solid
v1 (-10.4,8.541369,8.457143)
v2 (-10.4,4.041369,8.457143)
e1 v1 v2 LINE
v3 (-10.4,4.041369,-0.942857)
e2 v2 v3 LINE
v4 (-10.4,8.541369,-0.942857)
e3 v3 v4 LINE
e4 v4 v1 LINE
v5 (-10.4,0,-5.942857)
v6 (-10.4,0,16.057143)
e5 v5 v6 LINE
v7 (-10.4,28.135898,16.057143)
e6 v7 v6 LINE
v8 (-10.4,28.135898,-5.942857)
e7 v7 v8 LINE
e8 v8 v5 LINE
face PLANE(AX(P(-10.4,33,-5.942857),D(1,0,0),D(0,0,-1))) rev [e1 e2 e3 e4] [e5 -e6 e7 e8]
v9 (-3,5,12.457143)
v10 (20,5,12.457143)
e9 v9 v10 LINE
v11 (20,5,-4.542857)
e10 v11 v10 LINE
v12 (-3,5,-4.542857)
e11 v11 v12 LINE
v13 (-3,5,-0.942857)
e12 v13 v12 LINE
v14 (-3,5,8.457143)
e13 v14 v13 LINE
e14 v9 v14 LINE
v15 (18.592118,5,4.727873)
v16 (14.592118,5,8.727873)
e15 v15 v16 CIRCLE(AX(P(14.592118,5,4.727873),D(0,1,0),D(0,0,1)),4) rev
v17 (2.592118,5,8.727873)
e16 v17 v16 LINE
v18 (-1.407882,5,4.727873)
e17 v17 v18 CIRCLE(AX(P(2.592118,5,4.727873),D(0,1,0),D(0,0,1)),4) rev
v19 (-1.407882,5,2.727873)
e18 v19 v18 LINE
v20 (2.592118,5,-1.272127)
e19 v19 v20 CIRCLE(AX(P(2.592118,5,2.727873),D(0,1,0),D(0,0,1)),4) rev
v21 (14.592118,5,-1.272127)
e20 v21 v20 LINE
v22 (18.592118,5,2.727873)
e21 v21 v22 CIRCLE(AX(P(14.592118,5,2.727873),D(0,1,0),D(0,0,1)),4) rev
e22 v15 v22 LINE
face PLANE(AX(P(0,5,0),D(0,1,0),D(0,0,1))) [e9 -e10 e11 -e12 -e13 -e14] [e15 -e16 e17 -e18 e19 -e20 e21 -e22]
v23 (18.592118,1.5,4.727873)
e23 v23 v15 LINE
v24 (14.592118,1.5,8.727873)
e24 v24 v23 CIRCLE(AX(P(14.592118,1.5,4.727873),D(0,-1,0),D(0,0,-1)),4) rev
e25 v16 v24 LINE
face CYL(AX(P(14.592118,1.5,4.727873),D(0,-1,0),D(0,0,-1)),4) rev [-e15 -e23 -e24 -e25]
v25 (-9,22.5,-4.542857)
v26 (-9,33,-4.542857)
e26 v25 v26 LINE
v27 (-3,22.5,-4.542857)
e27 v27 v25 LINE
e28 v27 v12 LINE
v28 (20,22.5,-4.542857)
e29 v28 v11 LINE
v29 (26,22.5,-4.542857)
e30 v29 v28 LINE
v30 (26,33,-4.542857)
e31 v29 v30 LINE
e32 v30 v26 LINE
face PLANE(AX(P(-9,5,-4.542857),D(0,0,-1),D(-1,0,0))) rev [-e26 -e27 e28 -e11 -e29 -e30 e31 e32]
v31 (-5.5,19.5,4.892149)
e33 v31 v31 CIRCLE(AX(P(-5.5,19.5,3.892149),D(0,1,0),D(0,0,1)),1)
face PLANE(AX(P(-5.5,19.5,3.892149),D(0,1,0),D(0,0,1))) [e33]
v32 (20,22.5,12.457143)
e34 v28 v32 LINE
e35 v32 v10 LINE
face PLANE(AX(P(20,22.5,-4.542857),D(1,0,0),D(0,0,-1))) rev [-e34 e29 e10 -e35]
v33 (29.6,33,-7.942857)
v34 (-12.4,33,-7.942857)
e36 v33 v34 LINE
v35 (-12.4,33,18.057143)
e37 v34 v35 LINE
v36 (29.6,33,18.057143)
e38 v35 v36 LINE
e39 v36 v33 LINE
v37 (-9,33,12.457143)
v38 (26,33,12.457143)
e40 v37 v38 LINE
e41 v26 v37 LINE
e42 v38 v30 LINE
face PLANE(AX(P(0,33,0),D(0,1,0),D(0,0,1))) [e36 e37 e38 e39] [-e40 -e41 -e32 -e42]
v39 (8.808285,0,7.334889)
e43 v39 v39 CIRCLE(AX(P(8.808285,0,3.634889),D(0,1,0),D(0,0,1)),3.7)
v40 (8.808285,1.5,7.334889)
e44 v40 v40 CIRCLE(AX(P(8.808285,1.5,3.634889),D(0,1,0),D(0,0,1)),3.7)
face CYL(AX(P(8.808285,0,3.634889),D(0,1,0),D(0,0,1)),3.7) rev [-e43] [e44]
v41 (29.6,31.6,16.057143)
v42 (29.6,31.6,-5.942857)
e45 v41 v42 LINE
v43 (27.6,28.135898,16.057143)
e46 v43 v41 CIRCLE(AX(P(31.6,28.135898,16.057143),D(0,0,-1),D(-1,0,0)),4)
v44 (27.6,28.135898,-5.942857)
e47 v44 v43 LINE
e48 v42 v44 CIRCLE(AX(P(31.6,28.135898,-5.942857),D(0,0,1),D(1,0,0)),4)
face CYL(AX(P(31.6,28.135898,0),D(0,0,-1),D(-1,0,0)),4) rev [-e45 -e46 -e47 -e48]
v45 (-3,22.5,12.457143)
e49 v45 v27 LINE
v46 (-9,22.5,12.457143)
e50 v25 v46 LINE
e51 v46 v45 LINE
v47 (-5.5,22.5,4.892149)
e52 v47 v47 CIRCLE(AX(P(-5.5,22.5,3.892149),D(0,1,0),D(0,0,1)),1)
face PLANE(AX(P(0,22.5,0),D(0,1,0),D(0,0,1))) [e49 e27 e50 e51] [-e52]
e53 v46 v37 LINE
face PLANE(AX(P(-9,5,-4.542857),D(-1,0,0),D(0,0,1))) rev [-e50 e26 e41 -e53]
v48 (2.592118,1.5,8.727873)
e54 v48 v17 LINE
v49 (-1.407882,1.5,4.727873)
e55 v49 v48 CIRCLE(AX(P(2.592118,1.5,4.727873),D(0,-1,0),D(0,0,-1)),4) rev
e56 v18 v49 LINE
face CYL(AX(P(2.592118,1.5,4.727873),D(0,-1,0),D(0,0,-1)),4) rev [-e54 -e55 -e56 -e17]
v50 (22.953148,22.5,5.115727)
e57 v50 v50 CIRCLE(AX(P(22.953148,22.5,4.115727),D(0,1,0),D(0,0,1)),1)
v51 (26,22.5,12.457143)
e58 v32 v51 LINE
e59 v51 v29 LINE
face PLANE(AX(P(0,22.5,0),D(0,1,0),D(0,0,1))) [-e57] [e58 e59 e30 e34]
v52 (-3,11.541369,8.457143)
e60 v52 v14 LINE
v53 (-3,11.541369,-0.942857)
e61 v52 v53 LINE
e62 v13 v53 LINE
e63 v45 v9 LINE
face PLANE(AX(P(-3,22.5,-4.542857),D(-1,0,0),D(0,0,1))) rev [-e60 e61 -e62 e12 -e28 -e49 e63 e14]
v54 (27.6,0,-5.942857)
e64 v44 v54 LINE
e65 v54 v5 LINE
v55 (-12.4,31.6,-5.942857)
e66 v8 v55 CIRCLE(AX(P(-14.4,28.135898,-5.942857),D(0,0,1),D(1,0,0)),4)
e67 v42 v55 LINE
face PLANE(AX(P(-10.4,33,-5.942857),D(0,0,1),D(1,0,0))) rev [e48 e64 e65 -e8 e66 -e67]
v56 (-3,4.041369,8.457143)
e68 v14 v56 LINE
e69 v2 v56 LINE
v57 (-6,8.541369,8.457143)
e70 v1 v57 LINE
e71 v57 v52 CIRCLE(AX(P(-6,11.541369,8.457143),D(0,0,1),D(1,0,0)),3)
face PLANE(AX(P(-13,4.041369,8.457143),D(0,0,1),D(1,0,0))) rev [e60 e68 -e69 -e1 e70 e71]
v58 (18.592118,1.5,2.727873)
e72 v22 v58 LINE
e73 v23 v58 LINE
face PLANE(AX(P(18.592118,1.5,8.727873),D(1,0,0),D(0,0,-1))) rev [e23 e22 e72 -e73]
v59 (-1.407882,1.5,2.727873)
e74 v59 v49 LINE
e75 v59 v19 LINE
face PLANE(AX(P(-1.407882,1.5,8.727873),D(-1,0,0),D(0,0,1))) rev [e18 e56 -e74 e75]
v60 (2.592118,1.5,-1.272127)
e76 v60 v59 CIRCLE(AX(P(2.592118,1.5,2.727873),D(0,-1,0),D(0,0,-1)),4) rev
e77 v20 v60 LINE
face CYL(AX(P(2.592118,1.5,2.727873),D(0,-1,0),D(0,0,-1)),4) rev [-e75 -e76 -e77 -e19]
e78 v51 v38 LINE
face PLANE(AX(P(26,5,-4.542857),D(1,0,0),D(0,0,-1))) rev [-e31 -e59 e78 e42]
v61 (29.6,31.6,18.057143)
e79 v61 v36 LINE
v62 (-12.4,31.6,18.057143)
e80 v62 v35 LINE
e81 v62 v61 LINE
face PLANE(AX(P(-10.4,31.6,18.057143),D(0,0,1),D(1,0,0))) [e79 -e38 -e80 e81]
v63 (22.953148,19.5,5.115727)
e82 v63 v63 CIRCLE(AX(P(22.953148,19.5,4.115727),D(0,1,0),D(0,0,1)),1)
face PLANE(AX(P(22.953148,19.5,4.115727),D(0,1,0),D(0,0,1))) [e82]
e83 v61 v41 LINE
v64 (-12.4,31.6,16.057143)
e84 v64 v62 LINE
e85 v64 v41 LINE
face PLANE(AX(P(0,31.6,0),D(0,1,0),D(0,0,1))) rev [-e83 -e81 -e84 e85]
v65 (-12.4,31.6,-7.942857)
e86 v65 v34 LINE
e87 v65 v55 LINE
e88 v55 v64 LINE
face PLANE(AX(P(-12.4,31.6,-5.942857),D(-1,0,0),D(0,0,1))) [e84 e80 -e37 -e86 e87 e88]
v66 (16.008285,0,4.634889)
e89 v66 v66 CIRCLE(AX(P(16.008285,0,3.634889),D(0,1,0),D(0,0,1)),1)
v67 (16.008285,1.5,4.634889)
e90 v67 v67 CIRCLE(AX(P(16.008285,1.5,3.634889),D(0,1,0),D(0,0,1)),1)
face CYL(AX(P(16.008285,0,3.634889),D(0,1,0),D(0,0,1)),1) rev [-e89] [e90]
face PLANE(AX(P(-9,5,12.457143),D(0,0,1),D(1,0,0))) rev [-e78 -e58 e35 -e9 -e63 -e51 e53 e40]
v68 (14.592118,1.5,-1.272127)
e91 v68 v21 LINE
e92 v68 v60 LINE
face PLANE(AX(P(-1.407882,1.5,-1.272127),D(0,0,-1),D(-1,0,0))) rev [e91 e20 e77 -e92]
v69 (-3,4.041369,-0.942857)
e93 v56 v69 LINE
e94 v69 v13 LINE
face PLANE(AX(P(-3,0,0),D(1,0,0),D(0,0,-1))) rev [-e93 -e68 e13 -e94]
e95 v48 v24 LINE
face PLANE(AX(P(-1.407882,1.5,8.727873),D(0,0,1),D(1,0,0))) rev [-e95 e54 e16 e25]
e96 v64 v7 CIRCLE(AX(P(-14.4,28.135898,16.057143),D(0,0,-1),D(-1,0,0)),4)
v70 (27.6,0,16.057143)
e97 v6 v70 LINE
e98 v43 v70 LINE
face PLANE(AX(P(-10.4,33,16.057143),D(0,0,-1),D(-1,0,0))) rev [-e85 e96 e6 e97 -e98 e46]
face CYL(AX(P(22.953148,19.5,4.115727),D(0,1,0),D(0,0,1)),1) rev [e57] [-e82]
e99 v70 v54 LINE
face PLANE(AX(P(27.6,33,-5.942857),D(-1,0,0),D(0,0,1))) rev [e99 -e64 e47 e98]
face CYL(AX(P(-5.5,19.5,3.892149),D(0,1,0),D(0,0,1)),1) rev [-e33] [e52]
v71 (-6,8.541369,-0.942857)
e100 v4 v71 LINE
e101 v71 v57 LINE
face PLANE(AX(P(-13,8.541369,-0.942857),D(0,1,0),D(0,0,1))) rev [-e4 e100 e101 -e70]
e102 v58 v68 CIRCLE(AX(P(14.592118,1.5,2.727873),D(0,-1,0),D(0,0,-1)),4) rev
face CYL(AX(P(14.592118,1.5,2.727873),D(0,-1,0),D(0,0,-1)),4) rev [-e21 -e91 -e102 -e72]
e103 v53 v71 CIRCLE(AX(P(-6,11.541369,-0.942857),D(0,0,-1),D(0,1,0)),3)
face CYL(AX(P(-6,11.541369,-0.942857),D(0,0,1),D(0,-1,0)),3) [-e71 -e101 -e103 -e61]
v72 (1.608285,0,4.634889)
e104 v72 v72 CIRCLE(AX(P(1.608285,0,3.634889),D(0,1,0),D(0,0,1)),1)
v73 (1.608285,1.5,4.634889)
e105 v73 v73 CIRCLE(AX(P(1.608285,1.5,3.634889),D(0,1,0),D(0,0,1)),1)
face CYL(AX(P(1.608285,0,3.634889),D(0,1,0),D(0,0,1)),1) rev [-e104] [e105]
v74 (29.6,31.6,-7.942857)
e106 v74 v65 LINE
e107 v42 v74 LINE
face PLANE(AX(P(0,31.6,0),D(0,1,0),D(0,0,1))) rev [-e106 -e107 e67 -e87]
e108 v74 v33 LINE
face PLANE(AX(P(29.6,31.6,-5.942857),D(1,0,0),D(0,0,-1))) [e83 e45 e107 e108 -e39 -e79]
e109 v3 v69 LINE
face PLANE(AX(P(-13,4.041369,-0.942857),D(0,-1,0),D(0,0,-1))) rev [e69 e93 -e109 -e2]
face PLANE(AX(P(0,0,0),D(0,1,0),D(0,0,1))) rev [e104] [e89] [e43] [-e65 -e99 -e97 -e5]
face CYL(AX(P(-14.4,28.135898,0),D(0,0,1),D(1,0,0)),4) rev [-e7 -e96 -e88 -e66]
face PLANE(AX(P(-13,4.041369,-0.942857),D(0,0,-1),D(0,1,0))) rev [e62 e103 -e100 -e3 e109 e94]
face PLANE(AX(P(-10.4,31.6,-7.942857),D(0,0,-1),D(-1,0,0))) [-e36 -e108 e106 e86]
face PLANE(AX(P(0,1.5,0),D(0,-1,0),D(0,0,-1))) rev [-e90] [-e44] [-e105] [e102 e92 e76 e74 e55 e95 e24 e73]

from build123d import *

# Parameters (mm, degrees)
SKETCH1_W           = 38
SKETCH1_H           = 22
BOSS_EXTRUDE1_DEPTH = 33
SKETCH2_W           = 35
SKETCH2_H           = 17
CUT_EXTRUDE1_DEPTH  = 28
SKETCH3_W           = 6
SKETCH3_H           = 17
BOSS_EXTRUDE2_DEPTH = 17.5
SKETCH4_W           = 42
SKETCH4_H           = 26
SKETCH4_W_2         = 38
SKETCH4_H_2         = 22
EXTRUDE_THIN2_DEPTH = 1.4
SKETCH5_R           = 1
CUT_EXTRUDE2_DEPTH  = 3
SKETCH6_R           = 1
CUT_EXTRUDE3_DEPTH  = 3
SKETCH7_W           = 9.4
SKETCH7_H           = 4.5
CUT_EXTRUDE4_DEPTH  = 10
SKETCH8_W           = 20
SKETCH8_H           = 10
CUT_EXTRUDE5_DEPTH  = 3.5
SKETCH9_R           = 3.7
SKETCH9_R_2         = 1
CUT_EXTRUDE6_DEPTH  = 47.845174865
FILLET1_R           = 4
FILLET2_R           = 3
FILLET3_R           = 4


with BuildPart() as part:
    # Sketch1 → Boss-Extrude1 (new body)
    with BuildSketch(Plane(origin=(0, 0, 0), x_dir=(1, 0, 0), z_dir=(0, 1, 0))):
        with Locations((8.6, -5.057142857)):
            Rectangle(SKETCH1_W, SKETCH1_H)
    extrude(amount=BOSS_EXTRUDE1_DEPTH)

    # Sketch2 → Cut-Extrude1 (cut)
    with BuildSketch(Plane(origin=(0, 33, 0), x_dir=(1, 0, 0), z_dir=(0, 1, 0))):
        with Locations((8.5, -3.957142857)):
            Rectangle(SKETCH2_W, SKETCH2_H)
    extrude(amount=-CUT_EXTRUDE1_DEPTH, mode=Mode.SUBTRACT)

    # Sketch3 → Boss-Extrude2 (add)
    with BuildSketch(Plane(origin=(0, 5, 0), x_dir=(1, 0, 0), z_dir=(0, 1, 0))):
        with Locations((-6, -3.957142857)):
            Rectangle(SKETCH3_W, SKETCH3_H)
        with Locations((23, -3.957142857)):
            Rectangle(SKETCH3_W, SKETCH3_H)
    extrude(amount=BOSS_EXTRUDE2_DEPTH)

    # Sketch4 → Extrude-Thin2 (add)
    with BuildSketch(Plane(origin=(0, 33, 0), x_dir=(1, 0, 0), z_dir=(0, 1, 0))):
        with Locations((8.6, -5.057142857)):
            Rectangle(SKETCH4_W, SKETCH4_H)
        with Locations((8.6, -5.057142857)):
            Rectangle(SKETCH4_W_2, SKETCH4_H_2, mode=Mode.SUBTRACT)
    extrude(amount=-EXTRUDE_THIN2_DEPTH)

    # Sketch5 → Cut-Extrude2 (cut)
    with BuildSketch(Plane(origin=(0, 22.5, 0), x_dir=(1, 0, 0), z_dir=(0, 1, 0))):
        with Locations(Location((-5.5, -3.892148731, 0), (0, 0, 270))):
            Circle(SKETCH5_R)
    extrude(amount=-CUT_EXTRUDE2_DEPTH, mode=Mode.SUBTRACT)

    # Sketch6 → Cut-Extrude3 (cut)
    with BuildSketch(Plane(origin=(0, 22.5, 0), x_dir=(1, 0, 0), z_dir=(0, 1, 0))):
        with Locations(Location((22.953148274, -4.115727136, 0), (0, 0, 270))):
            Circle(SKETCH6_R)
    extrude(amount=-CUT_EXTRUDE3_DEPTH, mode=Mode.SUBTRACT)

    # Sketch7 → Cut-Extrude4 (cut)
    with BuildSketch(Plane(origin=(-3, 0, 0), x_dir=(0, 0, -1), z_dir=(1, 0, 0))):
        with Locations((-3.757142857, 6.291369126)):
            Rectangle(SKETCH7_W, SKETCH7_H)
    extrude(amount=-CUT_EXTRUDE4_DEPTH, mode=Mode.SUBTRACT)

    # Sketch8 → Cut-Extrude5 (cut)
    with BuildSketch(Plane(origin=(0, 5, 0), x_dir=(1, 0, 0), z_dir=(0, 1, 0))):
        with Locations((8.592117784, -3.72787339)):
            Rectangle(SKETCH8_W, SKETCH8_H)
    extrude(amount=-CUT_EXTRUDE5_DEPTH, mode=Mode.SUBTRACT)

    # Sketch9 → Cut-Extrude6 (cut, through all)
    with BuildSketch(Plane(origin=(0, 1.5, 0), x_dir=(1, 0, 0), z_dir=(0, 1, 0))):
        with Locations(Location((8.808284604, -3.634888569, 0), (0, 0, 270))):
            Circle(SKETCH9_R)
        with Locations(Location((1.608284604, -3.634888569, 0), (0, 0, 270))):
            Circle(SKETCH9_R_2)
        with Locations(Location((16.008284604, -3.634888569, 0), (0, 0, 270))):
            Circle(SKETCH9_R_2)
    extrude(amount=-CUT_EXTRUDE6_DEPTH, mode=Mode.SUBTRACT)

    # Fillet1
    fillet1_edges = [part.edges().sort_by_distance(p)[0] for p in [
        (-1.407882216, 3.25, 8.72787339),
        (-1.407882216, 3.25, -1.27212661),
        (18.592117784, 3.25, -1.27212661),
        (18.592117784, 3.25, 8.72787339),
    ]]
    fillet(fillet1_edges, radius=FILLET1_R)

    # Fillet2
    fillet2_edges = [part.edges().sort_by_distance(p)[0] for p in [
        (-3, 8.541369126, 3.757142857),
    ]]
    fillet(fillet2_edges, radius=FILLET2_R)

    # Fillet3
    # the kernel refuses this fillet: 4 mm, written as the material it adds along each edge
    with BuildSketch(Plane(origin=(-10.4, 31.6, 16.057142857), x_dir=(-1, 0, 0), z_dir=(0, 0, -1)), Plane(origin=(27.6, 31.6, -5.942857143), x_dir=(1, 0, 0), z_dir=(0, 0, 1))) as fillet3_piece_1:
        with BuildLine():
            CenterArc((4, -3.464101615), FILLET3_R, 120, 60)
            Line((0, -3.464101615), (-0.08, -3.464101615))
            Line((-0.08, -3.464101615), (-0.08, 0))
            Line((-0.08, 0), (0, 0.08))
            ThreePointArc((0, 0.08), (1, 0.08), (1.96, 0.069282032))
            Line((1.96, 0.069282032), (2, 0))
        make_face()
    extrude(amount=22)


solid = part.part
